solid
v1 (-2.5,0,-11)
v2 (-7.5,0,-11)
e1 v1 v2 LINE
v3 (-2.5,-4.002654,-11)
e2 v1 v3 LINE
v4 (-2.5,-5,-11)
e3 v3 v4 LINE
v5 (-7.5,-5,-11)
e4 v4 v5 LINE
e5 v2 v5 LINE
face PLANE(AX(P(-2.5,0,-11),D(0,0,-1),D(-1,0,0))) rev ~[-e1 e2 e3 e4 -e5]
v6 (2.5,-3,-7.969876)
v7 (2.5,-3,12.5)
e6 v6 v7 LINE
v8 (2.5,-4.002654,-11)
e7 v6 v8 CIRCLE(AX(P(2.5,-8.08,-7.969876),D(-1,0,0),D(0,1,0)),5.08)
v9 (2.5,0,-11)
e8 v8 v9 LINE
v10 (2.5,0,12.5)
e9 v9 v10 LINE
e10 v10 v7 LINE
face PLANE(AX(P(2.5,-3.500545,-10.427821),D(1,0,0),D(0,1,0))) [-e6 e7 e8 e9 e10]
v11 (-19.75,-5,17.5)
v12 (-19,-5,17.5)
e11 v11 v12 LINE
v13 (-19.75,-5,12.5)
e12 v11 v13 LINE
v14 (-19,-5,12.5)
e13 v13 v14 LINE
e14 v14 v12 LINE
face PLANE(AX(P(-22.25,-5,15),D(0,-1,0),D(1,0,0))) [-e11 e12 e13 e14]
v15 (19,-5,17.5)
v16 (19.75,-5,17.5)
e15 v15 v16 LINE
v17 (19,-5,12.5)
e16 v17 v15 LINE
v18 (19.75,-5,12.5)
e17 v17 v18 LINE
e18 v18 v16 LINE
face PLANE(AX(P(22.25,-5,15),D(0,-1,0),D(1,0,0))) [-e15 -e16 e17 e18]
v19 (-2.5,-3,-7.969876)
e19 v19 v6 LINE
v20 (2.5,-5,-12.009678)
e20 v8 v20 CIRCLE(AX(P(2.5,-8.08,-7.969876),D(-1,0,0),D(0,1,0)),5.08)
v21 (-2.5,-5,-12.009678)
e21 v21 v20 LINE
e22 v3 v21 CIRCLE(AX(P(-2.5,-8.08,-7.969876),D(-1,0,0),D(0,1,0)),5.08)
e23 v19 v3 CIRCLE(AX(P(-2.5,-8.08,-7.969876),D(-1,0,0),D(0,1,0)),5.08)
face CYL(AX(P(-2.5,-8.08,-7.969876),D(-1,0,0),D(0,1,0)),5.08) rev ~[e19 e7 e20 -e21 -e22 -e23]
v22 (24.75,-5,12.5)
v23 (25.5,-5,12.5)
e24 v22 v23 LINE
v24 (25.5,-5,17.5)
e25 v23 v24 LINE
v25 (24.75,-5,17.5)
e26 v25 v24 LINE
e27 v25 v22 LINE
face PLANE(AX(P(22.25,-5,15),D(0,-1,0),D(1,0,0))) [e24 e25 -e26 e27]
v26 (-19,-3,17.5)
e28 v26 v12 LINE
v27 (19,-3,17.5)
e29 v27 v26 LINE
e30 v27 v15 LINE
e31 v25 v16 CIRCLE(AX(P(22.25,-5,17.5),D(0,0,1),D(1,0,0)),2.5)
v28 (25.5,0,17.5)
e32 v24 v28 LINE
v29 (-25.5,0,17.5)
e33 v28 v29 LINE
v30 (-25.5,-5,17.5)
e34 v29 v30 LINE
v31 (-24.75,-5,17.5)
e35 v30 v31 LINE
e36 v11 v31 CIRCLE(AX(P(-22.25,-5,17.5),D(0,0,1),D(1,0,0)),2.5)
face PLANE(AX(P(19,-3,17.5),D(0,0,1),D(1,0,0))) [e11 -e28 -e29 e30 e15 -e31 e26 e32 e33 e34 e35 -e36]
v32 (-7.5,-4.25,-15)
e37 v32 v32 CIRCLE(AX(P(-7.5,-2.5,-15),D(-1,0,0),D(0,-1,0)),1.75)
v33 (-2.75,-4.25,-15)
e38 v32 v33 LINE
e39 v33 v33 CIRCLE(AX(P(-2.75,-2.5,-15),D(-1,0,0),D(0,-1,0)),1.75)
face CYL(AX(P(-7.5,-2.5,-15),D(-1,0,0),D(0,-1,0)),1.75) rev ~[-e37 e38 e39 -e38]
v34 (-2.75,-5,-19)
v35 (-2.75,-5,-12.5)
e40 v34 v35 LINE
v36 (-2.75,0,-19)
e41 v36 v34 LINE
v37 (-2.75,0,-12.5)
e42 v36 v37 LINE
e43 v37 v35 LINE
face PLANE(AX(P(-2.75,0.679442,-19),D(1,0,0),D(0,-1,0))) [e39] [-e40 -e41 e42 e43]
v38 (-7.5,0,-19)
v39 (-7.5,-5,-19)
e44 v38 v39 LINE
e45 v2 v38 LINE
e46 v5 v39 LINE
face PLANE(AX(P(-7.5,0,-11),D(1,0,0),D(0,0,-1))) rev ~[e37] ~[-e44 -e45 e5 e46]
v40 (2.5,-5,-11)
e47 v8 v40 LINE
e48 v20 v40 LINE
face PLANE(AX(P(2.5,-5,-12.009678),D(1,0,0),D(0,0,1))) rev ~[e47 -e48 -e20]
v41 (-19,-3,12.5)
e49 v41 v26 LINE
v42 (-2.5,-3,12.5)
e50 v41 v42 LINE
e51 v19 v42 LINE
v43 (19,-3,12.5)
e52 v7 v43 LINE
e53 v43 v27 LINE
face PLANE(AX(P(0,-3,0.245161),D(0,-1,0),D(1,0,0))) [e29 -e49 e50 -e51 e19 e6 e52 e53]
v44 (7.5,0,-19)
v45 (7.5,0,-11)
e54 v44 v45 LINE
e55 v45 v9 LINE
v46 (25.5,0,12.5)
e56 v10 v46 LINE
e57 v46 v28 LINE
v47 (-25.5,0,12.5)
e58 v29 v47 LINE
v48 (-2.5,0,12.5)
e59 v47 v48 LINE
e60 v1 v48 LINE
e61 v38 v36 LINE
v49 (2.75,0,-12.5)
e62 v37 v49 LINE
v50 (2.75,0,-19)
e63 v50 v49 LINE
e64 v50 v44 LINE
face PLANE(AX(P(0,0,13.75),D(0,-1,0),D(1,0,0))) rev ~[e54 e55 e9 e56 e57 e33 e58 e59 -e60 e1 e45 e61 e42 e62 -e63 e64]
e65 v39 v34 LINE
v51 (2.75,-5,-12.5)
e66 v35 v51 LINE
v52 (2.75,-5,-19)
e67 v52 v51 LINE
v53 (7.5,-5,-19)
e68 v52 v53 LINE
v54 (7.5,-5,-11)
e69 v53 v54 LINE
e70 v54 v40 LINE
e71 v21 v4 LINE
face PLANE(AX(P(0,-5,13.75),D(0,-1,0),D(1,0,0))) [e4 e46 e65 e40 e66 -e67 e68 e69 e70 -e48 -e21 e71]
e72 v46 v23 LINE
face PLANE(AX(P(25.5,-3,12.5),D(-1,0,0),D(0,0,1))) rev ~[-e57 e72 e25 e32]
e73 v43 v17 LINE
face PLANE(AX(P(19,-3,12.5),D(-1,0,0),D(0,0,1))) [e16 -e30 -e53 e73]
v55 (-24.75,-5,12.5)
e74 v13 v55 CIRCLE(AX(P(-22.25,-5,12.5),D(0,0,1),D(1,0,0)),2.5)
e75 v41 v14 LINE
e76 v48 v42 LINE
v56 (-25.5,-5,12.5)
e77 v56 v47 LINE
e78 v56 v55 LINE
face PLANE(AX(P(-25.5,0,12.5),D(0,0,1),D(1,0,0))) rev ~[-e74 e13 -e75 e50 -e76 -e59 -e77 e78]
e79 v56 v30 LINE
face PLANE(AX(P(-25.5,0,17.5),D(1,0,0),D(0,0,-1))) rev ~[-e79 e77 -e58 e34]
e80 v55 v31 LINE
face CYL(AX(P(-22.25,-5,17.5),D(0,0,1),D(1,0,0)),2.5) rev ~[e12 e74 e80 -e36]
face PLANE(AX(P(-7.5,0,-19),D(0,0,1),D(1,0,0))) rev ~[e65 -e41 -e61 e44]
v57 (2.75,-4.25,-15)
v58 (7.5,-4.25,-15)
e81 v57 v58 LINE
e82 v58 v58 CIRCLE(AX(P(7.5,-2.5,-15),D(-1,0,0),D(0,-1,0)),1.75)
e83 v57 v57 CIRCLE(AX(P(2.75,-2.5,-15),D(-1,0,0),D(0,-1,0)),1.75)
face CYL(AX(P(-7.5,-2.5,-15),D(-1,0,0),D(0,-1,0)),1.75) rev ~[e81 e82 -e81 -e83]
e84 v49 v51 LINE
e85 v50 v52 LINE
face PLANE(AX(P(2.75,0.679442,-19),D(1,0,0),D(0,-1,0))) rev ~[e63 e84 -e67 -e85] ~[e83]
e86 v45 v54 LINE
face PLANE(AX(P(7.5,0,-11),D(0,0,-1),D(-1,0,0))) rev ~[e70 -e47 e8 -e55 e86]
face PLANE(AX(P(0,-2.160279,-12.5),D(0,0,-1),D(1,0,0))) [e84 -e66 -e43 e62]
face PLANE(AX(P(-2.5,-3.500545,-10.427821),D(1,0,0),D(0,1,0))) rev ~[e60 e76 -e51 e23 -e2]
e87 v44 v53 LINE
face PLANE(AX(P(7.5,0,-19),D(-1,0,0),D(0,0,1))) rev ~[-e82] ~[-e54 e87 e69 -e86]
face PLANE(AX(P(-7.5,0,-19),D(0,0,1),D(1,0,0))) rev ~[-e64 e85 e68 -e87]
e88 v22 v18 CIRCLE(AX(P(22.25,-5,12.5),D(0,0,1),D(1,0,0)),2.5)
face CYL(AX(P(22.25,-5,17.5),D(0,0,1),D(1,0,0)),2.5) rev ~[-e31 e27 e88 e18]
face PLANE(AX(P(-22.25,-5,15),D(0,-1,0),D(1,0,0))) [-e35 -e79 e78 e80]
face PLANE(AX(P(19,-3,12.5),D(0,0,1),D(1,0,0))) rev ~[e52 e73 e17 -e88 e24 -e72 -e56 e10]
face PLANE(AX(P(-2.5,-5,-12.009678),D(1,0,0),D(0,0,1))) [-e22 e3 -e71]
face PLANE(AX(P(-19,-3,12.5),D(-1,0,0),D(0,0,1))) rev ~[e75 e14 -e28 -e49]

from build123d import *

# Parameters (mm, degrees)
F0_W        = 5
F0_H        = 2.5
F0_H_2      = 23.5
F0_H_3      = 4
F1_DEPTH    = 5
F2_W        = 5.5
F2_H        = 5.6794419712
F3_DEPTH    = 6.5
F4_R        = 1.75
F5_DEPTH    = 25.4
F6_W        = 5
F6_H        = 24.5096784085
F6_W_2      = 23
F6_H_2      = 5
F7_DEPTH    = 2
F8_T1_DEPTH = 5
F9_W        = 6.5
F9_H        = 5
F10_DEPTH   = 2
F11_R       = 2.5
F12_DEPTH   = 36.501


# Not quite as in the source:
# - a fillet or chamfer that OpenCascade refuses, or shapes differently, is made with other operations: its cross-section is extruded or revolved along the edge and cut away or added


with BuildPart() as f1:
    # F0 (on Front) → F1 (new body)
    with BuildSketch(Plane.XZ):
        with Locations((0, 13.75)):
            Rectangle(F0_W, F0_H)
        Polygon((-2.5, 15), (2.5, 15), (2.5, 12.5), (25.5, 12.5), (25.5, 17.5), (-25.5, 17.5), (-25.5, 12.5), (-2.5, 12.5), align=None)
        with Locations((0, 0.75)):
            Rectangle(F0_W, F0_H_2)
        Polygon((7.5, -11), (2.5, -11), (2.5, -15), (-2.5, -15), (-2.5, -11), (-7.5, -11), (-7.5, -19), (7.5, -19), align=None)
        with Locations((0, -13)):
            Rectangle(F0_W, F0_H_3)
    extrude(amount=F1_DEPTH)

    # F2 (on face) → F3 (cut)
    with BuildSketch(Plane(origin=(0, 0, -19), x_dir=(1, 0, 0), z_dir=(0, 0, -1))):
        with Locations((0, 2.1602790144)):
            Rectangle(F2_W, F2_H)
    extrude(amount=-F3_DEPTH, mode=Mode.SUBTRACT)

    # F4 (on face) → F5 (cut)
    with BuildSketch(Plane(origin=(-7.5, 0, 0), x_dir=(0, -1, 0), z_dir=(-1, 0, 0))):
        with Locations((2.5, -15)):
            Circle(F4_R)
    extrude(amount=-F5_DEPTH, mode=Mode.SUBTRACT)

    # F6 (on face) → F7 (cut)
    with BuildSketch(Plane.XZ.offset(5)):
        with Locations((0, 0.2451607957)):
            Rectangle(F6_W, F6_H)
        with Locations((-14, 15)):
            Rectangle(F6_W_2, F6_H_2)
        with Locations((0, 15)):
            Rectangle(F6_W, F6_H_2)
        with Locations((14, 15)):
            Rectangle(F6_W_2, F6_H_2)
    extrude(amount=-F7_DEPTH, mode=Mode.SUBTRACT)

    # F8: fillet of radius 5.08 on 1 edges, made by hand

    # F8_s2 → F8_t1 (join)
    with BuildSketch(Plane.YZ.offset(-2.5)):
        with BuildLine():
            ThreePointArc((-3, -7.9698764332), (-3.5273743839, -10.2237619671), (-5, -12.0096784085))
            Line((-5, -12.0096784085), (-3, -12.0096784085))
            Line((-3, -12.0096784085), (-3, -7.9698764332))
        make_face()
    extrude(amount=F8_T1_DEPTH)

    # F9 (on face) → F10 (join)
    with BuildSketch(Plane.XZ.offset(3)):
        with Locations((22.25, 15)):
            Rectangle(F9_W, F9_H)
        with Locations((-22.25, 15)):
            Rectangle(F9_W, F9_H)
    extrude(amount=F10_DEPTH)

    # F11 (on face) → F12 (cut, through all)
    with BuildSketch(Plane.XY.offset(17.5)):
        with Locations((22.25, -5)):
            Circle(F11_R)
        with Locations((-22.25, -5)):
            Circle(F11_R)
    extrude(amount=-F12_DEPTH, mode=Mode.SUBTRACT)


solid = f1.part
